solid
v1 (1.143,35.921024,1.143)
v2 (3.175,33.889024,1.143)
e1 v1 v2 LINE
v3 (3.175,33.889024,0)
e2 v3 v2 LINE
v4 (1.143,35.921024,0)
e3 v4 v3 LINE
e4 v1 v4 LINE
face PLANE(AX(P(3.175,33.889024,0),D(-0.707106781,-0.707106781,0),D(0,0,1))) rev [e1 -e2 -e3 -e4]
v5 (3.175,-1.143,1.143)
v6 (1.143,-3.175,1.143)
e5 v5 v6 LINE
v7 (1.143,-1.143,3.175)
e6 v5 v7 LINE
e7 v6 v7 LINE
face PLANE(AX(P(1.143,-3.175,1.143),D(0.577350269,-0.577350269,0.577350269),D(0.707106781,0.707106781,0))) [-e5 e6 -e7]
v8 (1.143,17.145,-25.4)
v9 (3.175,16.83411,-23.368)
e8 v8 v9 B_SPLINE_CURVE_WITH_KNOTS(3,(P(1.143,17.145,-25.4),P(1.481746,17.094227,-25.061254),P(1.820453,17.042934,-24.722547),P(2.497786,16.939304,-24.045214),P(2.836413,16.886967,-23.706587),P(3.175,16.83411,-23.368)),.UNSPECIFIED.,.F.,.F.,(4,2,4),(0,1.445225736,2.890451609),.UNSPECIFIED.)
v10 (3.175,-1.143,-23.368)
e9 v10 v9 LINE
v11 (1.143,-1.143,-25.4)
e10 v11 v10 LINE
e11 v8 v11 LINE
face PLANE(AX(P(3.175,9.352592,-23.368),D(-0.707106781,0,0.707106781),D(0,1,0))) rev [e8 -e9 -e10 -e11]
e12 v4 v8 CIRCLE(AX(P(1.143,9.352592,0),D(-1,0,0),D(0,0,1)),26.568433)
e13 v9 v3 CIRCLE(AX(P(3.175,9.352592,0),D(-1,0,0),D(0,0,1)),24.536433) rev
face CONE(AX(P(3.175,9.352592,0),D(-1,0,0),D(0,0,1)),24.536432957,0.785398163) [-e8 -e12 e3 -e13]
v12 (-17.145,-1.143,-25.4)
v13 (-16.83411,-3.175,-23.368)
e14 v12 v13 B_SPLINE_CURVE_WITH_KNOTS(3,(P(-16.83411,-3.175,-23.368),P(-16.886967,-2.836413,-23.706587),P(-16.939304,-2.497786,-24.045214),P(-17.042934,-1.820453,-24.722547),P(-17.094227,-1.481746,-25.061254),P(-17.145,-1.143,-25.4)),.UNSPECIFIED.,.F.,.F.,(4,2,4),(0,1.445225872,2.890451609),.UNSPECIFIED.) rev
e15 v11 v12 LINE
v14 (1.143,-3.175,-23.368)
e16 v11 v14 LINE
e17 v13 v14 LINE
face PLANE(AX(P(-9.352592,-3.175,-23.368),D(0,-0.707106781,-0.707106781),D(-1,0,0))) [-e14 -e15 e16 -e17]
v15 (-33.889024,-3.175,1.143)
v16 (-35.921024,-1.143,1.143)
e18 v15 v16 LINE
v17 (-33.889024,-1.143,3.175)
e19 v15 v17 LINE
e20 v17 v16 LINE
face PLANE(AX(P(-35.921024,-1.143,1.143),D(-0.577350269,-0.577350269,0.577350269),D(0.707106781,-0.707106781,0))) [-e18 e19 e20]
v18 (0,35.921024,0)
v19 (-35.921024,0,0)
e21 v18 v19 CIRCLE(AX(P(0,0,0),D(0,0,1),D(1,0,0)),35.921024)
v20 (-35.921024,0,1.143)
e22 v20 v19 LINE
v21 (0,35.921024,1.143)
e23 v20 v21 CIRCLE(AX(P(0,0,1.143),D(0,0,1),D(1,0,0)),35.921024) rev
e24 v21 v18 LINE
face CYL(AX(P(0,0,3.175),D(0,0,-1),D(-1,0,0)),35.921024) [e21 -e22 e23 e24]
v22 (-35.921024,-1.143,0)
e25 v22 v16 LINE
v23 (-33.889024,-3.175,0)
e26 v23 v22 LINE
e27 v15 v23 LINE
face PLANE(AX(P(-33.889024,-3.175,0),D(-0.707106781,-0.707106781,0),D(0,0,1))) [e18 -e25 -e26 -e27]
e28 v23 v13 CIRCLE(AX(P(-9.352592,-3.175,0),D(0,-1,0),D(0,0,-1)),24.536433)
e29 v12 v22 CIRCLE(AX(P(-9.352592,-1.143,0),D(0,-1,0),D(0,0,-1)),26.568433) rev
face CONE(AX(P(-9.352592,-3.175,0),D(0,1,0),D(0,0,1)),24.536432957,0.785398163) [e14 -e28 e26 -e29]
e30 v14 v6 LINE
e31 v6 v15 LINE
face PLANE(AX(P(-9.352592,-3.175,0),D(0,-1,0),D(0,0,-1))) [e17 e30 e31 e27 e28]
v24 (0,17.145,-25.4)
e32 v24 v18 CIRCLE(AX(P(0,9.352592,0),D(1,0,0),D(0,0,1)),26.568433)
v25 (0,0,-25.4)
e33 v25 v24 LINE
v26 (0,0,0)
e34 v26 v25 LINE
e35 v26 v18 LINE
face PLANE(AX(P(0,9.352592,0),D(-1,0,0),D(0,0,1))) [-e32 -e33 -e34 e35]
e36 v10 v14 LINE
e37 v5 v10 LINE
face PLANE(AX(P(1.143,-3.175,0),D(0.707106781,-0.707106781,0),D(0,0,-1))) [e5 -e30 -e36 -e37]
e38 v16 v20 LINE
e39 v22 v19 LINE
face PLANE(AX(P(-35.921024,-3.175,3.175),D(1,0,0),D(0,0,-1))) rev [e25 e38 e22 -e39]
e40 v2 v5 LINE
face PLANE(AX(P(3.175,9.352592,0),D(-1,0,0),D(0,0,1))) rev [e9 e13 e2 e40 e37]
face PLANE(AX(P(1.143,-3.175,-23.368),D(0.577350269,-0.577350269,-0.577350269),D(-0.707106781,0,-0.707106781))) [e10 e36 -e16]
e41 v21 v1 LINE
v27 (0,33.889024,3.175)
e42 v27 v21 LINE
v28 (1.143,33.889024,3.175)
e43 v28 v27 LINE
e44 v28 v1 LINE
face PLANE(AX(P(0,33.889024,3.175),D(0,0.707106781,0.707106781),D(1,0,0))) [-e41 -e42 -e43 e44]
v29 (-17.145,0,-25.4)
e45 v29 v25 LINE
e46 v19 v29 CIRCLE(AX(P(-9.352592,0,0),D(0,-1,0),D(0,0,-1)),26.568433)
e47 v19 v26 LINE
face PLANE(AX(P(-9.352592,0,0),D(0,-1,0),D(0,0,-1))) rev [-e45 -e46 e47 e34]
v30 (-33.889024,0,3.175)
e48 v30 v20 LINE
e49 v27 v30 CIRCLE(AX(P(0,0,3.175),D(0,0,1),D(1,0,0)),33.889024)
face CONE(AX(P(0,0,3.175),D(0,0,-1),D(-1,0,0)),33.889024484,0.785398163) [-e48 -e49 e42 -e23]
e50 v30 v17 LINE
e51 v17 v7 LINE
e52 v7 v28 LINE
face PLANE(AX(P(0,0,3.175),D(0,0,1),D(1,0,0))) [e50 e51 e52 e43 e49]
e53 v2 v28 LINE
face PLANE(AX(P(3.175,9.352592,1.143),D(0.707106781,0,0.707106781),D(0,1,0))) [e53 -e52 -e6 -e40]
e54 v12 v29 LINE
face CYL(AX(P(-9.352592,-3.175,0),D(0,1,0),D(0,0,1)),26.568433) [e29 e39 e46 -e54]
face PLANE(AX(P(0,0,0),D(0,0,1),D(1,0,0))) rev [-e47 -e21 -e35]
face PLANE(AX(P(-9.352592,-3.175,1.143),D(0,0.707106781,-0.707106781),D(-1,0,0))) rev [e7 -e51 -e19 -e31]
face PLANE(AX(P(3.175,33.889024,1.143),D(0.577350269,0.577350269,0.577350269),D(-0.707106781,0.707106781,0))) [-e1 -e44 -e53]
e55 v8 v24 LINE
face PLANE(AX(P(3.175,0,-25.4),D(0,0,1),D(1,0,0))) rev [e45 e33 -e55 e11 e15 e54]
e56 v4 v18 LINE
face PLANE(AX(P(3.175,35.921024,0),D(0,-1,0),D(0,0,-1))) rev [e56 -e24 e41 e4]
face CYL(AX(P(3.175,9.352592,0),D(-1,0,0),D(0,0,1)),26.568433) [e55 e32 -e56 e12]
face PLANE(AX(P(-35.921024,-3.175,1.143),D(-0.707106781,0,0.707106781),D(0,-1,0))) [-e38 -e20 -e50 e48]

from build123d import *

# Parameters (mm, degrees)
BOSS_EXTRUDE1_DEPTH = 3.175
BOSS_EXTRUDE2_DEPTH = 3.175
BOSS_EXTRUDE3_DEPTH = 3.175


with BuildPart() as part:
    # Sketch1 → Boss-Extrude1 (new body)
    with BuildSketch(Plane.XY):
        with BuildLine():
            Line((0, 0), (0, 35.921024484))
            ThreePointArc((0, 35.921024484), (-25.4, 25.4), (-35.921024484, 0))
            Line((-35.921024484, 0), (0, 0))
        make_face()
    extrude(amount=BOSS_EXTRUDE1_DEPTH)

    # Sketch2 → Boss-Extrude2 (add)
    with BuildSketch(Plane(origin=(0, 0, 0), x_dir=(0, 0, -1), z_dir=(1, 0, 0))):
        with BuildLine():
            Line((0, 0), (25.4, 0))
            Line((25.4, 0), (25.4, 17.145))
            ThreePointArc((25.4, 17.145), (15.793187578, 30.717442473), (0, 35.921024484))
            Line((0, 35.921024484), (-3.175, 35.921024484))
            Line((-3.175, 35.921024484), (-3.175, 0))
            Line((-3.175, 0), (0, 0))
        make_face()
    extrude(amount=BOSS_EXTRUDE2_DEPTH)

    # Sketch3 → Boss-Extrude3 (add)
    with BuildSketch(Plane.XZ):
        with BuildLine():
            Line((0, -25.4), (-17.145, -25.4))
            ThreePointArc((-17.145, -25.4), (-30.717442473, -15.793187578), (-35.921024484, 0))
            Line((-35.921024484, 0), (-35.921024484, 3.175))
            Line((-35.921024484, 3.175), (3.175, 3.175))
            Line((3.175, 3.175), (3.175, -25.4))
            Line((3.175, -25.4), (0, -25.4))
        make_face()
    extrude(amount=BOSS_EXTRUDE3_DEPTH)

    # Chamfer1
    # the kernel refuses this chamfer: 2.032 mm, written as the material it takes off along each edge
    with BuildSketch(Plane(origin=(1.820333333, 34.566357818, 1.820333333), x_dir=(0, -0.7071067811865468, 0.7071067811865481), z_dir=(0.5773502691896253, 0.5773502691896264, 0.5773502691896256))) as chamfer1_piece_1:
        Polygon((-1.436840979, -0.829560526), (1.436840979, -0.829560526), (0, 1.659121052), align=None)
    extrude(amount=2.580986643, mode=Mode.SUBTRACT)
    with BuildSketch(Plane(origin=(1.820333333, -1.820333333, -24.045333333), x_dir=(-0.7071067811865476, 0, -0.7071067811865476), z_dir=(0.5773502691896256, -0.577350269189626, -0.5773502691896256)), Plane(origin=(1.820333333, -1.820333333, 1.820333333), x_dir=(0.7071067811865476, 0, -0.7071067811865474), z_dir=(0.5773502691896254, -0.577350269189626, 0.577350269189626)), Plane(origin=(-34.566357818, -1.820333333, 1.820333333), x_dir=(0.7071067811865468, 0, 0.7071067811865481), z_dir=(-0.5773502691896263, -0.5773502691896255, 0.5773502691896255))) as chamfer1_piece_2:
        Polygon((-1.436840979, 0.829560526), (1.436840979, 0.829560526), (0, -1.659121052), align=None)
    extrude(amount=2.580986643, mode=Mode.SUBTRACT)
    with BuildSketch(Plane(origin=(0, 0, 3.175), x_dir=(0, 1, 0), z_dir=(1, 0, 0))) as chamfer1_piece_3:
        with BuildLine():
            Line((35.978498123, -2.089473639), (33.831550845, 0.057473639))
            Line((33.831550845, 0.057473639), (33.831550845, 0.098113639))
            ThreePointArc((33.831550845, 0.098113639), (34.876287665, 0.04064), (35.921024484, 0.04064))
            Line((35.921024484, 0.04064), (35.961664484, 0))
            ThreePointArc((35.961664484, 0), (35.961664484, -1.04473682), (36.019138123, -2.089473639))
            Line((36.019138123, -2.089473639), (35.978498123, -2.089473639))
        make_face()
    revolve(axis=Axis((0, 0, 3.175), (0, 0, 1)), revolution_arc=90, mode=Mode.SUBTRACT)
    with BuildSketch(Plane(origin=(0, 35.921024484, 3.175), x_dir=(0, -0.9996219169112968, 0.027495876610586455), z_dir=(1, 0, 0)), Plane(origin=(-35.921024484, -3.175, 0), x_dir=(0.9996219169112968, -0.027495876610586455, 0), z_dir=(0, 0, 1))) as chamfer1_piece_4:
        with BuildLine():
            Line((2.090263933, 0), (-0.114903819, 2.087103356))
            Line((-0.114903819, 2.087103356), (-0.155528453, 2.085985924))
            ThreePointArc((-0.155528453, 2.085985924), (-0.069350589, 1.04322439), (-0.040624635, -0.001117432))
            Line((-0.040624635, -0.001117432), (0.001117432, -0.040624635))
            ThreePointArc((0.001117432, -0.040624635), (1.045459255, -0.01189868), (2.091381365, -0.040624635))
            Line((2.091381365, -0.040624635), (2.090263933, 0))
        make_face()
    extrude(amount=8.400659832, mode=Mode.SUBTRACT)
    with BuildSketch(Plane(origin=(3.175, 22.370659832, -25.4), x_dir=(0.027495876610586455, 0, 0.9996219169112968), z_dir=(0, -1, 0))) as chamfer1_piece_5:
        with BuildLine():
            Line((2.090263933, 0), (-0.114903819, 2.087103356))
            Line((-0.114903819, 2.087103356), (-0.155528453, 2.085985924))
            ThreePointArc((-0.155528453, 2.085985924), (-0.069350589, 1.04322439), (-0.040624635, -0.001117432))
            Line((-0.040624635, -0.001117432), (0.001117432, -0.040624635))
            ThreePointArc((0.001117432, -0.040624635), (1.045459255, -0.01189868), (2.091381365, -0.040624635))
            Line((2.091381365, -0.040624635), (2.090263933, 0))
        make_face()
    extrude(amount=30.771319663, mode=Mode.SUBTRACT)
    with BuildSketch(Plane(origin=(3.175, 9.352591527, 0), x_dir=(0, 0.1007624019843993, -0.9949105177584235), z_dir=(0, -0.9949105177584235, -0.1007624019843993))) as chamfer1_piece_6:
        with BuildLine():
            Line((24.478959318, 0.057473639), (26.625906597, -2.089473639))
            Line((26.625906597, -2.089473639), (26.666546597, -2.089473639))
            ThreePointArc((26.666546597, -2.089473639), (26.609072957, -1.04473682), (26.609072957, 0))
            Line((26.609072957, 0), (26.568432957, 0.04064))
            ThreePointArc((26.568432957, 0.04064), (25.523696138, 0.04064), (24.478959318, 0.098113639))
            Line((24.478959318, 0.098113639), (24.478959318, 0.057473639))
        make_face()
    revolve(axis=Axis((3.175, 9.352591527, 0), (1, 0, 0)), revolution_arc=84.216925348, mode=Mode.SUBTRACT)
    with BuildSketch(Plane(origin=(3.175, 35.921024484, 0), x_dir=(0.027495876610586455, -0.9996219169112968, 0), z_dir=(0, 0, 1)), Plane(origin=(-35.921024484, 0, 3.175), x_dir=(0.9996219169112968, 0, 0.027495876610586455), z_dir=(0, -1, 0))) as chamfer1_piece_7:
        with BuildLine():
            Line((2.090263933, 0), (-0.114903819, -2.087103356))
            Line((-0.114903819, -2.087103356), (-0.155528453, -2.085985924))
            ThreePointArc((-0.155528453, -2.085985924), (-0.069350589, -1.04322439), (-0.040624635, 0.001117432))
            Line((-0.040624635, 0.001117432), (0.001117432, 0.040624635))
            ThreePointArc((0.001117432, 0.040624635), (1.045459255, 0.01189868), (2.091381365, 0.040624635))
            Line((2.091381365, 0.040624635), (2.090263933, 0))
        make_face()
    extrude(amount=8.400659832, mode=Mode.SUBTRACT)
    with BuildSketch(Plane(origin=(3.175, -8.400659832, 3.175), x_dir=(-0.9996219169112968, 0, 0.027495876610586435), z_dir=(0, 1, 0)), Plane(origin=(-41.146684316, -3.175, 3.175), x_dir=(0, 0.9996219169112968, 0.027495876610586435), z_dir=(1, 0, 0))) as chamfer1_piece_8:
        with BuildLine():
            Line((2.090263933, 0), (-0.114903819, -2.087103356))
            Line((-0.114903819, -2.087103356), (-0.155528453, -2.085985924))
            ThreePointArc((-0.155528453, -2.085985924), (-0.069350589, -1.04322439), (-0.040624635, 0.001117432))
            Line((-0.040624635, 0.001117432), (0.001117432, 0.040624635))
            ThreePointArc((0.001117432, 0.040624635), (1.045459255, 0.01189868), (2.091381365, 0.040624635))
            Line((2.091381365, 0.040624635), (2.090263933, 0))
        make_face()
    extrude(amount=49.547344147, mode=Mode.SUBTRACT)
    with BuildSketch(Plane(origin=(8.400659832, -3.175, -25.4), x_dir=(0, 0.9996219169112968, -0.027495876610585585), z_dir=(-1, 0, 0))) as chamfer1_piece_9:
        with BuildLine():
            Line((2.090263933, 0), (-0.114903819, -2.087103356))
            Line((-0.114903819, -2.087103356), (-0.155528453, -2.085985924))
            ThreePointArc((-0.155528453, -2.085985924), (-0.069350589, -1.04322439), (-0.040624635, 0.001117432))
            Line((-0.040624635, 0.001117432), (0.001117432, 0.040624635))
            ThreePointArc((0.001117432, 0.040624635), (1.045459255, 0.01189868), (2.091381365, 0.040624635))
            Line((2.091381365, 0.040624635), (2.090263933, 0))
        make_face()
    extrude(amount=30.771319663, mode=Mode.SUBTRACT)
    with BuildSketch(Plane(origin=(3.175, -3.175, 8.400659832), x_dir=(0.027495876610586435, 0.9996219169112968, 0), z_dir=(0, 0, -1))) as chamfer1_piece_10:
        with BuildLine():
            Line((2.090263933, 0), (-0.114903819, -2.087103356))
            Line((-0.114903819, -2.087103356), (-0.155528453, -2.085985924))
            ThreePointArc((-0.155528453, -2.085985924), (-0.069350589, -1.04322439), (-0.040624635, 0.001117432))
            Line((-0.040624635, 0.001117432), (0.001117432, 0.040624635))
            ThreePointArc((0.001117432, 0.040624635), (1.045459255, 0.01189868), (2.091381365, 0.040624635))
            Line((2.091381365, 0.040624635), (2.090263933, 0))
        make_face()
    extrude(amount=39.026319663, mode=Mode.SUBTRACT)
    with BuildSketch(Plane(origin=(-9.352591527, -3.175, 0), x_dir=(-0.1007624019843981, 0, -0.9949105177584237), z_dir=(0.9949105177584237, 0, -0.1007624019843981))) as chamfer1_piece_11:
        with BuildLine():
            Line((26.625906597, 2.089473639), (24.478959318, -0.057473639))
            Line((24.478959318, -0.057473639), (24.478959318, -0.098113639))
            ThreePointArc((24.478959318, -0.098113639), (25.523696138, -0.04064), (26.568432957, -0.04064))
            Line((26.568432957, -0.04064), (26.609072957, 0))
            ThreePointArc((26.609072957, 0), (26.609072957, 1.04473682), (26.666546597, 2.089473639))
            Line((26.666546597, 2.089473639), (26.625906597, 2.089473639))
        make_face()
    revolve(axis=Axis((-9.352591527, -3.175, 0), (0, 1, 0)), revolution_arc=84.216925348, mode=Mode.SUBTRACT)


solid = part.part
